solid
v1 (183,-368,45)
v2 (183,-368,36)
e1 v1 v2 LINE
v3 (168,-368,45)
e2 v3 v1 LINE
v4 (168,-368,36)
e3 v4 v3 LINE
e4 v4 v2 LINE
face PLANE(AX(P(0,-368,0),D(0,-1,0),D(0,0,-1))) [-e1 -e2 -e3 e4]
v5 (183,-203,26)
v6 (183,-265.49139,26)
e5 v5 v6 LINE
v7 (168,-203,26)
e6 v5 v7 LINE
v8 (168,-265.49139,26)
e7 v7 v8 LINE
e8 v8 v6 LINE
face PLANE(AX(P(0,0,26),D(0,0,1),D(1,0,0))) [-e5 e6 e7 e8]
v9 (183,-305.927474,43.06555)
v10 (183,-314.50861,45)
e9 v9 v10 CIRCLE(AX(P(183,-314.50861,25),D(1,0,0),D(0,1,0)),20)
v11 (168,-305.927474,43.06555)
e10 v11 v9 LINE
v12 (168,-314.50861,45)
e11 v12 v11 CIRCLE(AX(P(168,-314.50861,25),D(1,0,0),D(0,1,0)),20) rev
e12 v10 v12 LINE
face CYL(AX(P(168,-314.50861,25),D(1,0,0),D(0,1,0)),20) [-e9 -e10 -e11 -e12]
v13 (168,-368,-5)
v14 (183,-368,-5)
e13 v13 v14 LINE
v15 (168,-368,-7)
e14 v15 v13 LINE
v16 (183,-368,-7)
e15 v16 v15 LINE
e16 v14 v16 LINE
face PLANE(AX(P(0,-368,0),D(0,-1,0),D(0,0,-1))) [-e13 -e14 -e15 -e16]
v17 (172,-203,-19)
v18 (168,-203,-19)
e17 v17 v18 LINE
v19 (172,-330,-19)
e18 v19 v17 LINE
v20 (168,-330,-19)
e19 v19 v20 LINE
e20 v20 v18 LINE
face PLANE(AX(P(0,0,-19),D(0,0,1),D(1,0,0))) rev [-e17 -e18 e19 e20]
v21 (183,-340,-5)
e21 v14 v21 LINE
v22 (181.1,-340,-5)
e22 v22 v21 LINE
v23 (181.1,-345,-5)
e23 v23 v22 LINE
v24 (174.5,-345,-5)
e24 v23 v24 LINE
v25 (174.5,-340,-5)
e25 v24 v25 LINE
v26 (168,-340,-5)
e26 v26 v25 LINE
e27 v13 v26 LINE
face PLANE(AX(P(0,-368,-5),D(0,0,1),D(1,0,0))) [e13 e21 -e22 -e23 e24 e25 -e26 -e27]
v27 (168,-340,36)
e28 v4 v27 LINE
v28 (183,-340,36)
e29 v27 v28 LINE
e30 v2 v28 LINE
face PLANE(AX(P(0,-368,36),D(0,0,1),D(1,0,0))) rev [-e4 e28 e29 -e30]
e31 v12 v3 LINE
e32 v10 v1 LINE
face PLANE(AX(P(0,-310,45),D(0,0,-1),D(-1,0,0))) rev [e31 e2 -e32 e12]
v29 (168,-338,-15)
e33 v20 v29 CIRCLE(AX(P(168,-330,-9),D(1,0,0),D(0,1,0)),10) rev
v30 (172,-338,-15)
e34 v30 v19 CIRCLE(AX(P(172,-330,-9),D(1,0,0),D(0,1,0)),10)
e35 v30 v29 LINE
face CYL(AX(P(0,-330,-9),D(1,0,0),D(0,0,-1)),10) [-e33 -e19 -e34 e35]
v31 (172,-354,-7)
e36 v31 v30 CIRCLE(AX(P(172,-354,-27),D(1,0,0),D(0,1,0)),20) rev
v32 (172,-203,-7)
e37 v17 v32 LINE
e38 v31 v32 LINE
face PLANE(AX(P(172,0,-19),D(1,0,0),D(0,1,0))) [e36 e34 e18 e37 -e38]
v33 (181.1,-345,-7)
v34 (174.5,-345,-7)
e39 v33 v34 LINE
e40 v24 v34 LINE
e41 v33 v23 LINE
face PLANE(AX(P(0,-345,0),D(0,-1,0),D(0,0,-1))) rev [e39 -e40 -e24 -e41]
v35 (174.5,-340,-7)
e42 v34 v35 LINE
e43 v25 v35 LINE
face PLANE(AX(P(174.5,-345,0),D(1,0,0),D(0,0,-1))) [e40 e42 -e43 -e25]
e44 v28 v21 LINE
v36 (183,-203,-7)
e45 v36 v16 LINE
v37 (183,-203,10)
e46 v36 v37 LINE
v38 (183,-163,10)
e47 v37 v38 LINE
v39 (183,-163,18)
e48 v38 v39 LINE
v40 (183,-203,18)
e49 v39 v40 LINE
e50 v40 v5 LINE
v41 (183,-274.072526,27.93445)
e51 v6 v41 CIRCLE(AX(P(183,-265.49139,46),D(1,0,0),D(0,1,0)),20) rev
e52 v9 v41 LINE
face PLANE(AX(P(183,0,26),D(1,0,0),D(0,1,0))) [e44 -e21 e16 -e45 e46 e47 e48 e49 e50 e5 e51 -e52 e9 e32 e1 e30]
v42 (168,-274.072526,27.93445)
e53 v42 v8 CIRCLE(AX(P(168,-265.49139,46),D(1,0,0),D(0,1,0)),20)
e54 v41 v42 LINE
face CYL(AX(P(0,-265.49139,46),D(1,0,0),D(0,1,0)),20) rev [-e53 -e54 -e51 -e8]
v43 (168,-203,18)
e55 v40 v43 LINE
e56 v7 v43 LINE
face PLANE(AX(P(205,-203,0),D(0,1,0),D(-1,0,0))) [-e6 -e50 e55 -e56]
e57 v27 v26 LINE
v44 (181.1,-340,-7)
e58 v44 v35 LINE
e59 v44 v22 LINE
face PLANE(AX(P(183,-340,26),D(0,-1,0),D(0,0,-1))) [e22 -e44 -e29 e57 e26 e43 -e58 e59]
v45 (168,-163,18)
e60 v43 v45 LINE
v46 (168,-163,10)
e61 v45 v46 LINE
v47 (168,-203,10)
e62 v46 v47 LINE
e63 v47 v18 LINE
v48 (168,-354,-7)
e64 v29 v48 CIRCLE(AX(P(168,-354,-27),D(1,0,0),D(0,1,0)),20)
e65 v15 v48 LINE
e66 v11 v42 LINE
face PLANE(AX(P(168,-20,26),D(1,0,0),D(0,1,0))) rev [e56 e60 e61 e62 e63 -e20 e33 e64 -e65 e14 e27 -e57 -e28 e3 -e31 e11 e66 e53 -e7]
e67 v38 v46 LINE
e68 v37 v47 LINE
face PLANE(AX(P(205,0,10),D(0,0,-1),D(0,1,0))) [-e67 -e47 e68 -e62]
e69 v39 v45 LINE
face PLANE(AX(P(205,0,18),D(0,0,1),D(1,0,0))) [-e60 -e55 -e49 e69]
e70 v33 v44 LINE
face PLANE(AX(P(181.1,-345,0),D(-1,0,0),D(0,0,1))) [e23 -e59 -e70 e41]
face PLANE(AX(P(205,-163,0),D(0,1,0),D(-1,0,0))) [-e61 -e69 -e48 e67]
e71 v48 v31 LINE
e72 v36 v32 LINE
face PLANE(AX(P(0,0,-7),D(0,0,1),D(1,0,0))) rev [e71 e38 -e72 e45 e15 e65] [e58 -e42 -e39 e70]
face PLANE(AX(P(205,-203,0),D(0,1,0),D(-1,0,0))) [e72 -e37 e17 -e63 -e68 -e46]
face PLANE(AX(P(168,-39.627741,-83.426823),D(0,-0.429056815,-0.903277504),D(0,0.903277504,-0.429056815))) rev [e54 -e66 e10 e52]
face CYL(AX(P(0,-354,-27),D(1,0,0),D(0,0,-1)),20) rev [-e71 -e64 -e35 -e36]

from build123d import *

# Parameters (mm, degrees)
EXTRUDE_1_DEPTH        = 26
EXTRUDE_2_DEPTH        = 19
FILLET_1_R             = 10
SKETCH_5_W             = 161
SKETCH_5_H             = 6
CUT_EXTRUDE_1_DEPTH    = 52
SKETCH_1_5_W           = 11
SKETCH_1_5_H           = 340
EXTRUDE_4_DEPTH        = 7
SKETCH_6_W             = 1.9
SKETCH_6_H             = 2
SKETCH_6_W_2           = 6.6
EXTRUDE_5_DEPTH        = 28
SKETCH_6_3_W           = 6.6
SKETCH_6_3_H           = 2
CUT_EXTRUDE_2_DEPTH    = 5
FILLET_2_R             = 20
SKETCH_6_4_W           = 15
SKETCH_6_4_H           = 10
SKETCH_6_4_H_2         = 9
EXTRUDE_6_DEPTH        = 30
SKETCH_6_5_W           = 15
SKETCH_6_5_H           = 9
EXTRUDE_7_DEPTH        = 28
EXTRUDE_8_DEPTH        = 15
FILLET_3_R             = 20
FILLET_3_OF_MIRROR_2_R = 20
FILLET_4_R             = 20
SKETCH_11_W            = 20
SKETCH_11_H            = 20
CUT_EXTRUDE_3_DEPTH    = 617
SKETCH_10_W            = 20
SKETCH_10_H            = 10
CUT_EXTRUDE_4_DEPTH    = 617
SKETCH_12_W            = 7.5
SKETCH_12_H            = 20
SKETCH_12_W_2          = 0.5
SKETCH_12_W_3          = 16.5
SKETCH_12_W_4          = 12
CUT_EXTRUDE_6_DEPTH    = 37


with BuildPart() as part:
    # 스케치1 → 보스-돌출1 (new body)
    with BuildSketch(Plane.XY):
        Polygon((-168, 0), (168, 0), (183, 0), (183, -340), (168, -340), (168, -20), (-168, -20), (-168, -340), (-183, -340), (-183, 0), align=None)
    extrude(amount=EXTRUDE_1_DEPTH)

    # 스케치1<4> → 보스-돌출2 (add)
    with BuildSketch(Plane.XY):
        Polygon((172, 0), (168, 0), (168, -20), (168, -340), (172, -340), align=None)
        Polygon((-168, -20), (-168, 0), (-172, 0), (-172, -340), (-168, -340), align=None)
    extrude(amount=-EXTRUDE_2_DEPTH)

    # 필렛1
    fillet_1_edges = [part.edges().sort_by_distance(p)[0] for p in [
        (170, 0, -19),
        (170, -340, -19),
        (-170, -340, -19),
        (-170, 0, -19),
    ]]
    fillet(fillet_1_edges, radius=FILLET_1_R)

    # 스케치5 → 컷-돌출1 (cut)
    with BuildSketch(Plane(origin=(0, 0, 0), x_dir=(1, 0, 0), z_dir=(0, 1, 0))):
        with Locations((-87.5, -3)):
            Rectangle(SKETCH_5_W, SKETCH_5_H)
        with Locations((87.5, -3)):
            Rectangle(SKETCH_5_W, SKETCH_5_H)
    extrude(amount=-CUT_EXTRUDE_1_DEPTH, mode=Mode.SUBTRACT)

    # 스케치1<5> → 보스-돌출4 (add)
    with BuildSketch(Plane.XY):
        with Locations((177.5, -170)):
            Rectangle(SKETCH_1_5_W, SKETCH_1_5_H)
        with Locations((-177.5, -170)):
            Rectangle(SKETCH_1_5_W, SKETCH_1_5_H)
    extrude(amount=-EXTRUDE_4_DEPTH)

    # 스케치6 → 보스-돌출5 (add)
    with BuildSketch(Plane.XZ.offset(340)):
        with Locations((-182.05, -6)):
            Rectangle(SKETCH_6_W, SKETCH_6_H)
        with Locations((-177.8, -6)):
            Rectangle(SKETCH_6_W_2, SKETCH_6_H)
        Polygon((-174.5, -7), (-172, -7), (-168, -7), (-168, -5), (-174.5, -5), align=None)
    extrude_5 = extrude(amount=EXTRUDE_5_DEPTH)

    # 스케치6<3> → 컷-돌출2 (cut)
    with BuildSketch(Plane.XZ.offset(340)):
        with Locations((-177.8, -6)):
            Rectangle(SKETCH_6_3_W, SKETCH_6_3_H)
    cut_extrude_2 = extrude(amount=CUT_EXTRUDE_2_DEPTH, mode=Mode.SUBTRACT)

    # 필렛2
    # the kernel refuses this fillet: 20 mm, written as the material it adds along each edge
    with BuildSketch(Plane(origin=(-172, -340, -7), x_dir=(0, -1, 0), z_dir=(1, 0, 0))) as fillet_2_piece_1:
        with BuildLine():
            CenterArc((14, 20), FILLET_2_R, 216.869897646, 53.130102354)
            Line((-2, 8), (-3.6, 6.8))
            ThreePointArc((-3.6, 6.8), (-2, 2), (-2, 0))
            Line((-2, 0), (0, -2))
            Line((0, -2), (14, -2))
            Line((14, -2), (14, 0))
        make_face()
    extrude(amount=4)

    # 스케치6<4> → 보스-돌출6 (add)
    with BuildSketch(Plane.XZ.offset(340)):
        with Locations((-175.5, 31)):
            Rectangle(SKETCH_6_4_W, SKETCH_6_4_H)
        with Locations((-175.5, 40.5)):
            Rectangle(SKETCH_6_4_W, SKETCH_6_4_H_2)
    extrude_6 = extrude(amount=-EXTRUDE_6_DEPTH)

    # 스케치6<5> → 보스-돌출7 (add)
    with BuildSketch(Plane.XZ.offset(340)):
        with Locations((-175.5, 40.5)):
            Rectangle(SKETCH_6_5_W, SKETCH_6_5_H)
    extrude_7 = extrude(amount=EXTRUDE_7_DEPTH)

    # 스케치9 → 보스-돌출8 (add)
    with BuildSketch(Plane.ZY.offset(183)):
        Polygon((26, -310), (45, -310), (26, -270), align=None)
    extrude_8 = extrude(amount=-EXTRUDE_8_DEPTH)

    # 필렛3
    fillet_3_edges = [part.edges().sort_by_distance(p)[0] for p in [
        (-175.5, -310, 45),
        (-175.5, -270, 26),
    ]]
    fillet(fillet_3_edges, radius=FILLET_3_R)

    # 대칭 복사2: 보스-돌출5, 컷-돌출2, 보스-돌출6, 보스-돌출7, 보스-돌출8 across plane
    add(extrude_5.mirror(Plane(origin=(0, 0, 0), x_dir=(0, 0, 1), z_dir=(1, 0, 0))))
    add(cut_extrude_2.mirror(Plane(origin=(0, 0, 0), x_dir=(0, 0, 1), z_dir=(1, 0, 0))), mode=Mode.SUBTRACT)
    add(extrude_6.mirror(Plane(origin=(0, 0, 0), x_dir=(0, 0, 1), z_dir=(1, 0, 0))))
    add(extrude_7.mirror(Plane(origin=(0, 0, 0), x_dir=(0, 0, 1), z_dir=(1, 0, 0))))
    add(extrude_8.mirror(Plane(origin=(0, 0, 0), x_dir=(0, 0, 1), z_dir=(1, 0, 0))))

    # 필렛3 of 대칭 복사2
    fillet_3_of_mirror_2_edges = [part.edges().sort_by_distance(p)[0] for p in [
        (175.5, -310, 45),
        (175.5, -270, 26),
    ]]
    fillet(fillet_3_of_mirror_2_edges, radius=FILLET_3_OF_MIRROR_2_R)

    # 필렛4
    # the kernel refuses this fillet: 20 mm, written as the material it adds along each edge
    with BuildSketch(Plane(origin=(172, -340, -7), x_dir=(0, 0.24253562503633938, -0.9701425001453302), z_dir=(-1, 0, 0))) as fillet_4_piece_1:
        with BuildLine():
            CenterArc((16.007351252, 18.432707503), FILLET_4_R, 194.036243468, 53.130102354)
            Line((-3.395498751, 13.581995002), (-5.335783751, 13.096923752))
            Line((-5.335783751, 13.096923752), (-1.940285, -0.48507125))
            Line((-1.940285, -0.48507125), (0.48507125, -1.940285))
            ThreePointArc((0.48507125, -1.940285), (2.42535625, -1.45521375), (7.470097251, -1.84327075))
            Line((7.470097251, -1.84327075), (8.246211251, 0))
        make_face()
    extrude(amount=4)

    # 스케치11 → 컷-돌출3 (cut)
    with BuildSketch(Plane.ZY.offset(-168)):
        with BuildLine():
            ThreePointArc((45, -314.508610159), (44.510394688, -310.110371974), (43.065550087, -305.927473868))
            Line((43.065550087, -305.927473868), (27.934449913, -274.072526132))
            ThreePointArc((27.934449913, -274.072526132), (26.489605312, -269.889628026), (26, -265.491389841))
            Line((26, -265.491389841), (26, -20))
            Line((26, -20), (6, -20))
            Line((6, -20), (6, 0))
            Line((6, 0), (-7, 0))
            Line((-7, 0), (-7, -354))
            Line((-7, -354), (-7, -368))
            Line((-7, -368), (-5, -368))
            Line((-5, -368), (-5, -340))
            Line((-5, -340), (36, -340))
            Line((36, -340), (36, -368))
            Line((36, -368), (45, -368))
            Line((45, -368), (45, -314.508610159))
        make_face()
        with Locations((16, -10)):
            Rectangle(SKETCH_11_W, SKETCH_11_H)
        with BuildLine():
            Line((-7, -354), (-7, 0))
            Line((-7, 0), (-9, 0))
            ThreePointArc((-9, 0), (-16.071067812, -2.928932188), (-19, -10))
            Line((-19, -10), (-19, -330))
            ThreePointArc((-19, -330), (-17.94427191, -334.472135955), (-15, -338))
            ThreePointArc((-15, -338), (-9.11145618, -345.05572809), (-7, -354))
        make_face()
    extrude(amount=CUT_EXTRUDE_3_DEPTH, mode=Mode.SUBTRACT)

    # 스케치10 → 컷-돌출4 (cut)
    with BuildSketch(Plane(origin=(183, 0, 0), x_dir=(0, 0, -1), z_dir=(1, 0, 0))):
        with Locations((-16, -15)):
            Rectangle(SKETCH_10_W, SKETCH_10_H)
    extrude(amount=-CUT_EXTRUDE_4_DEPTH, mode=Mode.SUBTRACT)

    # 스케치12 → 컷-돌출6 (cut)
    with BuildSketch(Plane.ZY.offset(-168)):
        Polygon((18.5, -162.5), (18.5, -183), (26, -183), (26, -20), (6, -20), (6, -10), (26, -10), (26, 0), (-7, 0), (-7, -183), (9.5, -183), (9.5, -162.5), align=None)
        with Locations((22.25, -193)):
            Rectangle(SKETCH_12_W, SKETCH_12_H)
        with Locations((18.25, -193)):
            Rectangle(SKETCH_12_W_2, SKETCH_12_H)
        with Locations((9.75, -193)):
            Rectangle(SKETCH_12_W_2, SKETCH_12_H)
        Polygon((18, -163), (18, -183), (18.5, -183), (18.5, -162.5), (9.5, -162.5), (9.5, -183), (10, -183), (10, -163), align=None)
        with Locations((1.25, -193)):
            Rectangle(SKETCH_12_W_3, SKETCH_12_H)
        with BuildLine():
            Line((-19, -183), (-7, -183))
            Line((-7, -183), (-7, 0))
            Line((-7, 0), (-9, 0))
            ThreePointArc((-9, 0), (-16.071067812, -2.928932188), (-19, -10))
            Line((-19, -10), (-19, -183))
        make_face()
        with Locations((-13, -193)):
            Rectangle(SKETCH_12_W_4, SKETCH_12_H)
    extrude(amount=-CUT_EXTRUDE_6_DEPTH, mode=Mode.SUBTRACT)


solid = part.part
